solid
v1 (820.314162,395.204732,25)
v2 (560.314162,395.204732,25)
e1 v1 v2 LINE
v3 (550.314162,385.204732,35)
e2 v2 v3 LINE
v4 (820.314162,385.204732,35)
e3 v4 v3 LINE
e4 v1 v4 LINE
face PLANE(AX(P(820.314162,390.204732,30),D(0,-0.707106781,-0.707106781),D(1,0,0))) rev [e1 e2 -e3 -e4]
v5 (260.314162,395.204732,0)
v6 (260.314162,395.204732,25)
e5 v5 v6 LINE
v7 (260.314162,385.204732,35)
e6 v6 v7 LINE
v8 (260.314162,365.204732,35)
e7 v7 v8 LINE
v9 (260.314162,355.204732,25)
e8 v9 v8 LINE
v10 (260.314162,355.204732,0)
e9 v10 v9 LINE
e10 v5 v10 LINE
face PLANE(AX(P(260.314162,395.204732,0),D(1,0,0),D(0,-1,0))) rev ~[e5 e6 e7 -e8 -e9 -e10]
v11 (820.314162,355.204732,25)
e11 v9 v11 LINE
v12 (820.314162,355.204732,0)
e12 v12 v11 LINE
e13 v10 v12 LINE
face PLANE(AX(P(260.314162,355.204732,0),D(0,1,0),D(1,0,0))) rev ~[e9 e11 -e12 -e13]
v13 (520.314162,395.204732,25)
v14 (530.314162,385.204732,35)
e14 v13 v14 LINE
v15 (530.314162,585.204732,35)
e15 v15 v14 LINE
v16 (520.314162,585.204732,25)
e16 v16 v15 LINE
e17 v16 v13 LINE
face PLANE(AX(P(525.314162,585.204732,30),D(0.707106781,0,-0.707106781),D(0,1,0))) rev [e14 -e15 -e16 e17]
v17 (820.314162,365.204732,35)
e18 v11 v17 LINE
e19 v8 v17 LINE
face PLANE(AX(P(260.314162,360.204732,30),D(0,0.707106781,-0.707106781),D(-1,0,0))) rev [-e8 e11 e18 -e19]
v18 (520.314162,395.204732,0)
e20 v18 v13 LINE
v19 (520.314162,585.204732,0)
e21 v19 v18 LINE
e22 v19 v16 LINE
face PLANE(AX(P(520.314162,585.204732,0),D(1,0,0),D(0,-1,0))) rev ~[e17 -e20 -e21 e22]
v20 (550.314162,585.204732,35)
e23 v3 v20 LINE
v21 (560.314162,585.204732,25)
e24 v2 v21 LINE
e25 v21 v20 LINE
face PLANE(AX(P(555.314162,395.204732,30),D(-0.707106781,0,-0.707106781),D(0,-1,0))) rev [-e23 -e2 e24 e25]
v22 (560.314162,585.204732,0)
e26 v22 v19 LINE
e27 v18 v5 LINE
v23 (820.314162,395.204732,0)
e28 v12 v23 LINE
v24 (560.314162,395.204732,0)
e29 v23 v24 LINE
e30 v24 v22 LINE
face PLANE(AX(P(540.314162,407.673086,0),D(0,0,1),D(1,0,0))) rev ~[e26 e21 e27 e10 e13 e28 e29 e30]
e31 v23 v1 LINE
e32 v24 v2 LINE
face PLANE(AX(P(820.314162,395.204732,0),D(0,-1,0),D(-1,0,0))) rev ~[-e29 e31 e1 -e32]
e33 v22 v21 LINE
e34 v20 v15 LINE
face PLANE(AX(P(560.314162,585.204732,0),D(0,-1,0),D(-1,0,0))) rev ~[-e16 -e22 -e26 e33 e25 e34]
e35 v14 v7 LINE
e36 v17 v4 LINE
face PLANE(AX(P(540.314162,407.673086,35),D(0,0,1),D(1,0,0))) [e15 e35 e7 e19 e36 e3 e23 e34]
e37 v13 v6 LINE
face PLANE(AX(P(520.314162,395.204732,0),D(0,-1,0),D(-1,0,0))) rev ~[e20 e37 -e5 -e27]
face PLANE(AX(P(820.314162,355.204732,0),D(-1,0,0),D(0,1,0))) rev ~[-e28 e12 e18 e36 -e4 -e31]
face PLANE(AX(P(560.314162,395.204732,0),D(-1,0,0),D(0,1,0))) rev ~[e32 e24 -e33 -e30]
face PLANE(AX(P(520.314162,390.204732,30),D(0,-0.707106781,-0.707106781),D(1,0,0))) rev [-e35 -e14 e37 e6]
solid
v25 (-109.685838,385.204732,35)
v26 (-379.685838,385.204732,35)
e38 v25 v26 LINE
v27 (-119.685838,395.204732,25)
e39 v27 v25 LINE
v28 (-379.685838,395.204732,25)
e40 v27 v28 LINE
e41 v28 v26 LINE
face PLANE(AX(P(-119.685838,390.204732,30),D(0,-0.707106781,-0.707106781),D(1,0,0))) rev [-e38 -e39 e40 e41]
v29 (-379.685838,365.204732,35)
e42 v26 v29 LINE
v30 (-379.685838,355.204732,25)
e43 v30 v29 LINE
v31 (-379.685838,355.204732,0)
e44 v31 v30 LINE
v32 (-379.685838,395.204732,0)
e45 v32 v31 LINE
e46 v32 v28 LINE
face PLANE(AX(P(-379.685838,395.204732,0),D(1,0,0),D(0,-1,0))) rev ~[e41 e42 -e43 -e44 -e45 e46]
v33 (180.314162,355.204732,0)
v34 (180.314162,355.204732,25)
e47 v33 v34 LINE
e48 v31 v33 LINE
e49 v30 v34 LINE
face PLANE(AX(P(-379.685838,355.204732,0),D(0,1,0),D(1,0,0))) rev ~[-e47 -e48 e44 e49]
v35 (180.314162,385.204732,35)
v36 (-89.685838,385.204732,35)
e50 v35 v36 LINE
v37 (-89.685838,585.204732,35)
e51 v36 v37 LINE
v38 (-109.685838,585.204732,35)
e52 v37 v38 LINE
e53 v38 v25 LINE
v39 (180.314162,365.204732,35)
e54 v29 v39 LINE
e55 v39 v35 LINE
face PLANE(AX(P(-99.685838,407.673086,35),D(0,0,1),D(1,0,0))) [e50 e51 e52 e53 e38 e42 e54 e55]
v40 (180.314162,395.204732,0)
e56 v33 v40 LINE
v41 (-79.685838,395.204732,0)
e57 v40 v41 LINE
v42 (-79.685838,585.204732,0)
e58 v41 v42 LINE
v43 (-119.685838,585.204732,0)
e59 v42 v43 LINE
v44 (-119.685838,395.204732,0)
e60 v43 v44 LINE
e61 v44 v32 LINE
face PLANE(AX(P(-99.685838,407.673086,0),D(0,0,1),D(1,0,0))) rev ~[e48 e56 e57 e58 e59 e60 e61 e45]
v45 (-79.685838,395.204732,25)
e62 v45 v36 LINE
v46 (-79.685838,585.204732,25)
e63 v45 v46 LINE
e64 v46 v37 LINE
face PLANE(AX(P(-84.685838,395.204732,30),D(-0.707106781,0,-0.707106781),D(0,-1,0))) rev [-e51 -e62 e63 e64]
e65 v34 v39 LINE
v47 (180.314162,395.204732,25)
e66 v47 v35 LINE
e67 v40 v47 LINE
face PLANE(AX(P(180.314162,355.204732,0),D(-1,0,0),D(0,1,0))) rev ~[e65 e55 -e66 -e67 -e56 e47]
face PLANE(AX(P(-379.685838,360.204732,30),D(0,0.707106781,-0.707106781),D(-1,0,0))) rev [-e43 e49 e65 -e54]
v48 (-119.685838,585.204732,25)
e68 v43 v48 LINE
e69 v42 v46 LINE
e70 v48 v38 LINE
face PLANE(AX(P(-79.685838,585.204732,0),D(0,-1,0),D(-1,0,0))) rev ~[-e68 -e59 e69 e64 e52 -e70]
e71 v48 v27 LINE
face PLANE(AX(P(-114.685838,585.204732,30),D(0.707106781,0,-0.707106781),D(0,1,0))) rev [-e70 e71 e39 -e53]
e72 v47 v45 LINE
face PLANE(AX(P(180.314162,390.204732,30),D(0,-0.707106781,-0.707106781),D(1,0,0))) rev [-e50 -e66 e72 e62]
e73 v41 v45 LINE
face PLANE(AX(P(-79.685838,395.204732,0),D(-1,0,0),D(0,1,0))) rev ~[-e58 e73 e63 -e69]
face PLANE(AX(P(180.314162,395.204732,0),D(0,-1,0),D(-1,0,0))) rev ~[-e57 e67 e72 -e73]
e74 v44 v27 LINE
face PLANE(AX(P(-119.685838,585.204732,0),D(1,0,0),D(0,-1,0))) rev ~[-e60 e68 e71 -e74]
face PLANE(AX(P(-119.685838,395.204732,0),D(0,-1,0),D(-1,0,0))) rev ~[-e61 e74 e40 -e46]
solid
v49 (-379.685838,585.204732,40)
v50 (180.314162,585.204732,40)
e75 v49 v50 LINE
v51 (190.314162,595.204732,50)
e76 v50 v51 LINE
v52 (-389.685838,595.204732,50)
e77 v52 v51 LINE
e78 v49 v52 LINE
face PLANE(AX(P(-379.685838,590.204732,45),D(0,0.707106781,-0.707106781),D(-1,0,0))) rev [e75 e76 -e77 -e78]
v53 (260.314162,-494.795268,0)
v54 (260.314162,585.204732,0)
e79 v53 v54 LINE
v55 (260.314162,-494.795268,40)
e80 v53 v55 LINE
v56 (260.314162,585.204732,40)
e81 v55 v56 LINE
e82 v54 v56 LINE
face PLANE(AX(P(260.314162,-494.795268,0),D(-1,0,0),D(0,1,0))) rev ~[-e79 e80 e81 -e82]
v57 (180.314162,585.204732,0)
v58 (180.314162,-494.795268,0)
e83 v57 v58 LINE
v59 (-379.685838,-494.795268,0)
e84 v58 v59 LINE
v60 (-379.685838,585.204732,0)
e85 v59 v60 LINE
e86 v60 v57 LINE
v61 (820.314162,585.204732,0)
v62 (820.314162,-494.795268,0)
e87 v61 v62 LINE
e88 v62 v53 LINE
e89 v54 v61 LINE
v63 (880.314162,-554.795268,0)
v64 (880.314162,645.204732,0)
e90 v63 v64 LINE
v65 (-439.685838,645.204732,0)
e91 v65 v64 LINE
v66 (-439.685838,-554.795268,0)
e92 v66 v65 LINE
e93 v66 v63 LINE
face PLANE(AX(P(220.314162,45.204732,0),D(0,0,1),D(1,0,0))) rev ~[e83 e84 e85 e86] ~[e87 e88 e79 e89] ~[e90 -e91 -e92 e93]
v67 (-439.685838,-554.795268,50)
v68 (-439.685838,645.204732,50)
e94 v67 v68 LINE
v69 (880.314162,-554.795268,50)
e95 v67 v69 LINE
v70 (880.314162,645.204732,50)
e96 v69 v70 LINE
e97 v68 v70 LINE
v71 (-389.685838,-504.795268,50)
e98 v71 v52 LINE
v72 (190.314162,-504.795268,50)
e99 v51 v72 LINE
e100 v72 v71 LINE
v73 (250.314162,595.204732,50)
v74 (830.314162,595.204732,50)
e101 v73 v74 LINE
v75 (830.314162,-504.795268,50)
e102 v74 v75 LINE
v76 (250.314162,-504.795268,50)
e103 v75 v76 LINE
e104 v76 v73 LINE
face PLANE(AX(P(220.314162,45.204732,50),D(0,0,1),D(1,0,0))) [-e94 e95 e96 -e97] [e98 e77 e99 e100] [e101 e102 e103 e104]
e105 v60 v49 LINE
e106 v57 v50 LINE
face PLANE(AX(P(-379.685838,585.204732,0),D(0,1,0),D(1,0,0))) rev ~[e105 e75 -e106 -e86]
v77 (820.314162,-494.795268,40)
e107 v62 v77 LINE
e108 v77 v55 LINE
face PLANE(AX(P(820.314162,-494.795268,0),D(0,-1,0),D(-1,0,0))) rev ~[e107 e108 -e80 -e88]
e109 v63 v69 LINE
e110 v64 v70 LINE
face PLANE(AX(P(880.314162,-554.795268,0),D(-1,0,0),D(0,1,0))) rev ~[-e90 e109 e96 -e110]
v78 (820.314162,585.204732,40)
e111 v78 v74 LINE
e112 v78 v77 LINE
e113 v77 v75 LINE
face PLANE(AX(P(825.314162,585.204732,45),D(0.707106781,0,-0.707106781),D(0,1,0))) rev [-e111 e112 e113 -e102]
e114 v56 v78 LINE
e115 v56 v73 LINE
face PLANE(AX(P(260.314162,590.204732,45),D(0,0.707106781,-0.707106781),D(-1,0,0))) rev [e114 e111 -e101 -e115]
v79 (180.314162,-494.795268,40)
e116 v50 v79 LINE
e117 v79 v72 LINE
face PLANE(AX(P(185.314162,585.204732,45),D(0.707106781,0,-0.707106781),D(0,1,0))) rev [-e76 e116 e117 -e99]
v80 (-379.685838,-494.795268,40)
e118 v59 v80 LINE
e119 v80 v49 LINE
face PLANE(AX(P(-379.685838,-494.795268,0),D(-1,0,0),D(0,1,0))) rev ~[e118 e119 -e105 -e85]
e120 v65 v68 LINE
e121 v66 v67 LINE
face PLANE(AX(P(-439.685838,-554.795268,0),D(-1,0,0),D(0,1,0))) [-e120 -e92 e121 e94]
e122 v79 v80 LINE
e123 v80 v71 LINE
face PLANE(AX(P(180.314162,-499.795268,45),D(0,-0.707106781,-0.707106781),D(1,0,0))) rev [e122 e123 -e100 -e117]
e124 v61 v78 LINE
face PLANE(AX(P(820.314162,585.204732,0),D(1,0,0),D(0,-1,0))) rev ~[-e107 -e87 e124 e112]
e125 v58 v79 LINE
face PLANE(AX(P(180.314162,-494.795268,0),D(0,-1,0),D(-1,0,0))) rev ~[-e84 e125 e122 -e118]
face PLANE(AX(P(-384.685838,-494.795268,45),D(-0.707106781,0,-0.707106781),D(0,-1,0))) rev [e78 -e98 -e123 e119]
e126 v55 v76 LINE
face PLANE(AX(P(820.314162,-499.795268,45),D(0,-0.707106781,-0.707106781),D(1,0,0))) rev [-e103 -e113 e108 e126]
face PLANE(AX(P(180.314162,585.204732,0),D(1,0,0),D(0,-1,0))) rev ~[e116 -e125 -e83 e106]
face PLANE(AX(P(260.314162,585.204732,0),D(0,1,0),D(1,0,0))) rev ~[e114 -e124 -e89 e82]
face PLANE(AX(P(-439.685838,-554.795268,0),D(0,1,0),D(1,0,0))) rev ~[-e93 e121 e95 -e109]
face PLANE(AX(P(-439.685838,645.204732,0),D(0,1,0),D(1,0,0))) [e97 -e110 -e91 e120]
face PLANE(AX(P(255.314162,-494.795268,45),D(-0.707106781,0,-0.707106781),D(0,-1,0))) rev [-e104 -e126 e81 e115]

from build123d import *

# Parameters (mm, degrees)
F0_W      = 1320
F0_H      = 1200
F1_DEPTH  = 50
F2_DEPTH  = 35
F3_SIZE   = 10
F3_2_SIZE = 10
F3_3_SIZE = 10


with BuildPart() as f1:
    # F0 (on Top) → F1 (new body)
    with BuildSketch(Plane.XY):
        with Locations((220.3141621128, 45.2047318473)):
            Rectangle(F0_W, F0_H)
        Polygon((-379.6858378872, -494.7952681527), (-379.6858378872, 355.2047318473), (-379.6858378872, 395.2047318473), (-379.6858378872, 585.2047318473), (-119.6858378872, 585.2047318473), (-79.6858378872, 585.2047318473), (180.3141621128, 585.2047318473), (180.3141621128, 395.2047318473), (180.3141621128, 355.2047318473), (180.3141621128, -494.7952681527), align=None, mode=Mode.SUBTRACT)
        Polygon((260.3141621128, -494.7952681527), (260.3141621128, 355.2047318473), (260.3141621128, 395.2047318473), (260.3141621128, 585.2047318473), (520.3141621128, 585.2047318473), (560.3141621128, 585.2047318473), (820.3141621128, 585.2047318473), (820.3141621128, 395.2047318473), (820.3141621128, 355.2047318473), (820.3141621128, -494.7952681527), align=None, mode=Mode.SUBTRACT)
    extrude(amount=F1_DEPTH)

    # F3
    f3_edges = [f1.edges().sort_by_distance(p)[0] for p in [
        (-379.685838, 45.204732, 50),
        (-99.685838, 585.204732, 50),
        (180.314162, 45.204732, 50),
        (260.314162, 45.204732, 50),
        (540.314162, 585.204732, 50),
        (820.314162, 45.204732, 50),
        (540.314162, -494.795268, 50),
        (-99.685838, -494.795268, 50),
    ]]
    chamfer(f3_edges, length=F3_SIZE)


with BuildPart() as f2:
    # F0 (on Top) → F2 (new body)
    with BuildSketch(Plane.XY):
        Polygon((-379.6858378872, 395.2047318473), (-379.6858378872, 355.2047318473), (180.3141621128, 355.2047318473), (180.3141621128, 395.2047318473), (-79.6858378872, 395.2047318473), (-79.6858378872, 585.2047318473), (-119.6858378872, 585.2047318473), (-119.6858378872, 395.2047318473), align=None)
    extrude(amount=F2_DEPTH)

    # F3#2
    f3_2_edges = [f2.edges().sort_by_distance(p)[0] for p in [
        (-99.685838, 355.204732, 35),
        (50.314162, 395.204732, 35),
        (-79.685838, 490.204732, 35),
        (-119.685838, 490.204732, 35),
        (-249.685838, 395.204732, 35),
    ]]
    chamfer(f3_2_edges, length=F3_2_SIZE)


with BuildPart() as f2b:
    # F0 (on Top) → F2, piece 2 (new body)
    with BuildSketch(Plane.XY):
        Polygon((260.3141621128, 395.2047318473), (260.3141621128, 355.2047318473), (820.3141621128, 355.2047318473), (820.3141621128, 395.2047318473), (560.3141621128, 395.2047318473), (560.3141621128, 585.2047318473), (520.3141621128, 585.2047318473), (520.3141621128, 395.2047318473), align=None)
    extrude(amount=F2_DEPTH)

    # F3#3
    f3_3_edges = [f2b.edges().sort_by_distance(p)[0] for p in [
        (540.314162, 355.204732, 35),
        (390.314162, 395.204732, 35),
        (560.314162, 490.204732, 35),
        (690.314162, 395.204732, 35),
        (520.314162, 490.204732, 35),
    ]]
    chamfer(f3_3_edges, length=F3_3_SIZE)


solid = Compound([f1.part, f2.part, f2b.part])
